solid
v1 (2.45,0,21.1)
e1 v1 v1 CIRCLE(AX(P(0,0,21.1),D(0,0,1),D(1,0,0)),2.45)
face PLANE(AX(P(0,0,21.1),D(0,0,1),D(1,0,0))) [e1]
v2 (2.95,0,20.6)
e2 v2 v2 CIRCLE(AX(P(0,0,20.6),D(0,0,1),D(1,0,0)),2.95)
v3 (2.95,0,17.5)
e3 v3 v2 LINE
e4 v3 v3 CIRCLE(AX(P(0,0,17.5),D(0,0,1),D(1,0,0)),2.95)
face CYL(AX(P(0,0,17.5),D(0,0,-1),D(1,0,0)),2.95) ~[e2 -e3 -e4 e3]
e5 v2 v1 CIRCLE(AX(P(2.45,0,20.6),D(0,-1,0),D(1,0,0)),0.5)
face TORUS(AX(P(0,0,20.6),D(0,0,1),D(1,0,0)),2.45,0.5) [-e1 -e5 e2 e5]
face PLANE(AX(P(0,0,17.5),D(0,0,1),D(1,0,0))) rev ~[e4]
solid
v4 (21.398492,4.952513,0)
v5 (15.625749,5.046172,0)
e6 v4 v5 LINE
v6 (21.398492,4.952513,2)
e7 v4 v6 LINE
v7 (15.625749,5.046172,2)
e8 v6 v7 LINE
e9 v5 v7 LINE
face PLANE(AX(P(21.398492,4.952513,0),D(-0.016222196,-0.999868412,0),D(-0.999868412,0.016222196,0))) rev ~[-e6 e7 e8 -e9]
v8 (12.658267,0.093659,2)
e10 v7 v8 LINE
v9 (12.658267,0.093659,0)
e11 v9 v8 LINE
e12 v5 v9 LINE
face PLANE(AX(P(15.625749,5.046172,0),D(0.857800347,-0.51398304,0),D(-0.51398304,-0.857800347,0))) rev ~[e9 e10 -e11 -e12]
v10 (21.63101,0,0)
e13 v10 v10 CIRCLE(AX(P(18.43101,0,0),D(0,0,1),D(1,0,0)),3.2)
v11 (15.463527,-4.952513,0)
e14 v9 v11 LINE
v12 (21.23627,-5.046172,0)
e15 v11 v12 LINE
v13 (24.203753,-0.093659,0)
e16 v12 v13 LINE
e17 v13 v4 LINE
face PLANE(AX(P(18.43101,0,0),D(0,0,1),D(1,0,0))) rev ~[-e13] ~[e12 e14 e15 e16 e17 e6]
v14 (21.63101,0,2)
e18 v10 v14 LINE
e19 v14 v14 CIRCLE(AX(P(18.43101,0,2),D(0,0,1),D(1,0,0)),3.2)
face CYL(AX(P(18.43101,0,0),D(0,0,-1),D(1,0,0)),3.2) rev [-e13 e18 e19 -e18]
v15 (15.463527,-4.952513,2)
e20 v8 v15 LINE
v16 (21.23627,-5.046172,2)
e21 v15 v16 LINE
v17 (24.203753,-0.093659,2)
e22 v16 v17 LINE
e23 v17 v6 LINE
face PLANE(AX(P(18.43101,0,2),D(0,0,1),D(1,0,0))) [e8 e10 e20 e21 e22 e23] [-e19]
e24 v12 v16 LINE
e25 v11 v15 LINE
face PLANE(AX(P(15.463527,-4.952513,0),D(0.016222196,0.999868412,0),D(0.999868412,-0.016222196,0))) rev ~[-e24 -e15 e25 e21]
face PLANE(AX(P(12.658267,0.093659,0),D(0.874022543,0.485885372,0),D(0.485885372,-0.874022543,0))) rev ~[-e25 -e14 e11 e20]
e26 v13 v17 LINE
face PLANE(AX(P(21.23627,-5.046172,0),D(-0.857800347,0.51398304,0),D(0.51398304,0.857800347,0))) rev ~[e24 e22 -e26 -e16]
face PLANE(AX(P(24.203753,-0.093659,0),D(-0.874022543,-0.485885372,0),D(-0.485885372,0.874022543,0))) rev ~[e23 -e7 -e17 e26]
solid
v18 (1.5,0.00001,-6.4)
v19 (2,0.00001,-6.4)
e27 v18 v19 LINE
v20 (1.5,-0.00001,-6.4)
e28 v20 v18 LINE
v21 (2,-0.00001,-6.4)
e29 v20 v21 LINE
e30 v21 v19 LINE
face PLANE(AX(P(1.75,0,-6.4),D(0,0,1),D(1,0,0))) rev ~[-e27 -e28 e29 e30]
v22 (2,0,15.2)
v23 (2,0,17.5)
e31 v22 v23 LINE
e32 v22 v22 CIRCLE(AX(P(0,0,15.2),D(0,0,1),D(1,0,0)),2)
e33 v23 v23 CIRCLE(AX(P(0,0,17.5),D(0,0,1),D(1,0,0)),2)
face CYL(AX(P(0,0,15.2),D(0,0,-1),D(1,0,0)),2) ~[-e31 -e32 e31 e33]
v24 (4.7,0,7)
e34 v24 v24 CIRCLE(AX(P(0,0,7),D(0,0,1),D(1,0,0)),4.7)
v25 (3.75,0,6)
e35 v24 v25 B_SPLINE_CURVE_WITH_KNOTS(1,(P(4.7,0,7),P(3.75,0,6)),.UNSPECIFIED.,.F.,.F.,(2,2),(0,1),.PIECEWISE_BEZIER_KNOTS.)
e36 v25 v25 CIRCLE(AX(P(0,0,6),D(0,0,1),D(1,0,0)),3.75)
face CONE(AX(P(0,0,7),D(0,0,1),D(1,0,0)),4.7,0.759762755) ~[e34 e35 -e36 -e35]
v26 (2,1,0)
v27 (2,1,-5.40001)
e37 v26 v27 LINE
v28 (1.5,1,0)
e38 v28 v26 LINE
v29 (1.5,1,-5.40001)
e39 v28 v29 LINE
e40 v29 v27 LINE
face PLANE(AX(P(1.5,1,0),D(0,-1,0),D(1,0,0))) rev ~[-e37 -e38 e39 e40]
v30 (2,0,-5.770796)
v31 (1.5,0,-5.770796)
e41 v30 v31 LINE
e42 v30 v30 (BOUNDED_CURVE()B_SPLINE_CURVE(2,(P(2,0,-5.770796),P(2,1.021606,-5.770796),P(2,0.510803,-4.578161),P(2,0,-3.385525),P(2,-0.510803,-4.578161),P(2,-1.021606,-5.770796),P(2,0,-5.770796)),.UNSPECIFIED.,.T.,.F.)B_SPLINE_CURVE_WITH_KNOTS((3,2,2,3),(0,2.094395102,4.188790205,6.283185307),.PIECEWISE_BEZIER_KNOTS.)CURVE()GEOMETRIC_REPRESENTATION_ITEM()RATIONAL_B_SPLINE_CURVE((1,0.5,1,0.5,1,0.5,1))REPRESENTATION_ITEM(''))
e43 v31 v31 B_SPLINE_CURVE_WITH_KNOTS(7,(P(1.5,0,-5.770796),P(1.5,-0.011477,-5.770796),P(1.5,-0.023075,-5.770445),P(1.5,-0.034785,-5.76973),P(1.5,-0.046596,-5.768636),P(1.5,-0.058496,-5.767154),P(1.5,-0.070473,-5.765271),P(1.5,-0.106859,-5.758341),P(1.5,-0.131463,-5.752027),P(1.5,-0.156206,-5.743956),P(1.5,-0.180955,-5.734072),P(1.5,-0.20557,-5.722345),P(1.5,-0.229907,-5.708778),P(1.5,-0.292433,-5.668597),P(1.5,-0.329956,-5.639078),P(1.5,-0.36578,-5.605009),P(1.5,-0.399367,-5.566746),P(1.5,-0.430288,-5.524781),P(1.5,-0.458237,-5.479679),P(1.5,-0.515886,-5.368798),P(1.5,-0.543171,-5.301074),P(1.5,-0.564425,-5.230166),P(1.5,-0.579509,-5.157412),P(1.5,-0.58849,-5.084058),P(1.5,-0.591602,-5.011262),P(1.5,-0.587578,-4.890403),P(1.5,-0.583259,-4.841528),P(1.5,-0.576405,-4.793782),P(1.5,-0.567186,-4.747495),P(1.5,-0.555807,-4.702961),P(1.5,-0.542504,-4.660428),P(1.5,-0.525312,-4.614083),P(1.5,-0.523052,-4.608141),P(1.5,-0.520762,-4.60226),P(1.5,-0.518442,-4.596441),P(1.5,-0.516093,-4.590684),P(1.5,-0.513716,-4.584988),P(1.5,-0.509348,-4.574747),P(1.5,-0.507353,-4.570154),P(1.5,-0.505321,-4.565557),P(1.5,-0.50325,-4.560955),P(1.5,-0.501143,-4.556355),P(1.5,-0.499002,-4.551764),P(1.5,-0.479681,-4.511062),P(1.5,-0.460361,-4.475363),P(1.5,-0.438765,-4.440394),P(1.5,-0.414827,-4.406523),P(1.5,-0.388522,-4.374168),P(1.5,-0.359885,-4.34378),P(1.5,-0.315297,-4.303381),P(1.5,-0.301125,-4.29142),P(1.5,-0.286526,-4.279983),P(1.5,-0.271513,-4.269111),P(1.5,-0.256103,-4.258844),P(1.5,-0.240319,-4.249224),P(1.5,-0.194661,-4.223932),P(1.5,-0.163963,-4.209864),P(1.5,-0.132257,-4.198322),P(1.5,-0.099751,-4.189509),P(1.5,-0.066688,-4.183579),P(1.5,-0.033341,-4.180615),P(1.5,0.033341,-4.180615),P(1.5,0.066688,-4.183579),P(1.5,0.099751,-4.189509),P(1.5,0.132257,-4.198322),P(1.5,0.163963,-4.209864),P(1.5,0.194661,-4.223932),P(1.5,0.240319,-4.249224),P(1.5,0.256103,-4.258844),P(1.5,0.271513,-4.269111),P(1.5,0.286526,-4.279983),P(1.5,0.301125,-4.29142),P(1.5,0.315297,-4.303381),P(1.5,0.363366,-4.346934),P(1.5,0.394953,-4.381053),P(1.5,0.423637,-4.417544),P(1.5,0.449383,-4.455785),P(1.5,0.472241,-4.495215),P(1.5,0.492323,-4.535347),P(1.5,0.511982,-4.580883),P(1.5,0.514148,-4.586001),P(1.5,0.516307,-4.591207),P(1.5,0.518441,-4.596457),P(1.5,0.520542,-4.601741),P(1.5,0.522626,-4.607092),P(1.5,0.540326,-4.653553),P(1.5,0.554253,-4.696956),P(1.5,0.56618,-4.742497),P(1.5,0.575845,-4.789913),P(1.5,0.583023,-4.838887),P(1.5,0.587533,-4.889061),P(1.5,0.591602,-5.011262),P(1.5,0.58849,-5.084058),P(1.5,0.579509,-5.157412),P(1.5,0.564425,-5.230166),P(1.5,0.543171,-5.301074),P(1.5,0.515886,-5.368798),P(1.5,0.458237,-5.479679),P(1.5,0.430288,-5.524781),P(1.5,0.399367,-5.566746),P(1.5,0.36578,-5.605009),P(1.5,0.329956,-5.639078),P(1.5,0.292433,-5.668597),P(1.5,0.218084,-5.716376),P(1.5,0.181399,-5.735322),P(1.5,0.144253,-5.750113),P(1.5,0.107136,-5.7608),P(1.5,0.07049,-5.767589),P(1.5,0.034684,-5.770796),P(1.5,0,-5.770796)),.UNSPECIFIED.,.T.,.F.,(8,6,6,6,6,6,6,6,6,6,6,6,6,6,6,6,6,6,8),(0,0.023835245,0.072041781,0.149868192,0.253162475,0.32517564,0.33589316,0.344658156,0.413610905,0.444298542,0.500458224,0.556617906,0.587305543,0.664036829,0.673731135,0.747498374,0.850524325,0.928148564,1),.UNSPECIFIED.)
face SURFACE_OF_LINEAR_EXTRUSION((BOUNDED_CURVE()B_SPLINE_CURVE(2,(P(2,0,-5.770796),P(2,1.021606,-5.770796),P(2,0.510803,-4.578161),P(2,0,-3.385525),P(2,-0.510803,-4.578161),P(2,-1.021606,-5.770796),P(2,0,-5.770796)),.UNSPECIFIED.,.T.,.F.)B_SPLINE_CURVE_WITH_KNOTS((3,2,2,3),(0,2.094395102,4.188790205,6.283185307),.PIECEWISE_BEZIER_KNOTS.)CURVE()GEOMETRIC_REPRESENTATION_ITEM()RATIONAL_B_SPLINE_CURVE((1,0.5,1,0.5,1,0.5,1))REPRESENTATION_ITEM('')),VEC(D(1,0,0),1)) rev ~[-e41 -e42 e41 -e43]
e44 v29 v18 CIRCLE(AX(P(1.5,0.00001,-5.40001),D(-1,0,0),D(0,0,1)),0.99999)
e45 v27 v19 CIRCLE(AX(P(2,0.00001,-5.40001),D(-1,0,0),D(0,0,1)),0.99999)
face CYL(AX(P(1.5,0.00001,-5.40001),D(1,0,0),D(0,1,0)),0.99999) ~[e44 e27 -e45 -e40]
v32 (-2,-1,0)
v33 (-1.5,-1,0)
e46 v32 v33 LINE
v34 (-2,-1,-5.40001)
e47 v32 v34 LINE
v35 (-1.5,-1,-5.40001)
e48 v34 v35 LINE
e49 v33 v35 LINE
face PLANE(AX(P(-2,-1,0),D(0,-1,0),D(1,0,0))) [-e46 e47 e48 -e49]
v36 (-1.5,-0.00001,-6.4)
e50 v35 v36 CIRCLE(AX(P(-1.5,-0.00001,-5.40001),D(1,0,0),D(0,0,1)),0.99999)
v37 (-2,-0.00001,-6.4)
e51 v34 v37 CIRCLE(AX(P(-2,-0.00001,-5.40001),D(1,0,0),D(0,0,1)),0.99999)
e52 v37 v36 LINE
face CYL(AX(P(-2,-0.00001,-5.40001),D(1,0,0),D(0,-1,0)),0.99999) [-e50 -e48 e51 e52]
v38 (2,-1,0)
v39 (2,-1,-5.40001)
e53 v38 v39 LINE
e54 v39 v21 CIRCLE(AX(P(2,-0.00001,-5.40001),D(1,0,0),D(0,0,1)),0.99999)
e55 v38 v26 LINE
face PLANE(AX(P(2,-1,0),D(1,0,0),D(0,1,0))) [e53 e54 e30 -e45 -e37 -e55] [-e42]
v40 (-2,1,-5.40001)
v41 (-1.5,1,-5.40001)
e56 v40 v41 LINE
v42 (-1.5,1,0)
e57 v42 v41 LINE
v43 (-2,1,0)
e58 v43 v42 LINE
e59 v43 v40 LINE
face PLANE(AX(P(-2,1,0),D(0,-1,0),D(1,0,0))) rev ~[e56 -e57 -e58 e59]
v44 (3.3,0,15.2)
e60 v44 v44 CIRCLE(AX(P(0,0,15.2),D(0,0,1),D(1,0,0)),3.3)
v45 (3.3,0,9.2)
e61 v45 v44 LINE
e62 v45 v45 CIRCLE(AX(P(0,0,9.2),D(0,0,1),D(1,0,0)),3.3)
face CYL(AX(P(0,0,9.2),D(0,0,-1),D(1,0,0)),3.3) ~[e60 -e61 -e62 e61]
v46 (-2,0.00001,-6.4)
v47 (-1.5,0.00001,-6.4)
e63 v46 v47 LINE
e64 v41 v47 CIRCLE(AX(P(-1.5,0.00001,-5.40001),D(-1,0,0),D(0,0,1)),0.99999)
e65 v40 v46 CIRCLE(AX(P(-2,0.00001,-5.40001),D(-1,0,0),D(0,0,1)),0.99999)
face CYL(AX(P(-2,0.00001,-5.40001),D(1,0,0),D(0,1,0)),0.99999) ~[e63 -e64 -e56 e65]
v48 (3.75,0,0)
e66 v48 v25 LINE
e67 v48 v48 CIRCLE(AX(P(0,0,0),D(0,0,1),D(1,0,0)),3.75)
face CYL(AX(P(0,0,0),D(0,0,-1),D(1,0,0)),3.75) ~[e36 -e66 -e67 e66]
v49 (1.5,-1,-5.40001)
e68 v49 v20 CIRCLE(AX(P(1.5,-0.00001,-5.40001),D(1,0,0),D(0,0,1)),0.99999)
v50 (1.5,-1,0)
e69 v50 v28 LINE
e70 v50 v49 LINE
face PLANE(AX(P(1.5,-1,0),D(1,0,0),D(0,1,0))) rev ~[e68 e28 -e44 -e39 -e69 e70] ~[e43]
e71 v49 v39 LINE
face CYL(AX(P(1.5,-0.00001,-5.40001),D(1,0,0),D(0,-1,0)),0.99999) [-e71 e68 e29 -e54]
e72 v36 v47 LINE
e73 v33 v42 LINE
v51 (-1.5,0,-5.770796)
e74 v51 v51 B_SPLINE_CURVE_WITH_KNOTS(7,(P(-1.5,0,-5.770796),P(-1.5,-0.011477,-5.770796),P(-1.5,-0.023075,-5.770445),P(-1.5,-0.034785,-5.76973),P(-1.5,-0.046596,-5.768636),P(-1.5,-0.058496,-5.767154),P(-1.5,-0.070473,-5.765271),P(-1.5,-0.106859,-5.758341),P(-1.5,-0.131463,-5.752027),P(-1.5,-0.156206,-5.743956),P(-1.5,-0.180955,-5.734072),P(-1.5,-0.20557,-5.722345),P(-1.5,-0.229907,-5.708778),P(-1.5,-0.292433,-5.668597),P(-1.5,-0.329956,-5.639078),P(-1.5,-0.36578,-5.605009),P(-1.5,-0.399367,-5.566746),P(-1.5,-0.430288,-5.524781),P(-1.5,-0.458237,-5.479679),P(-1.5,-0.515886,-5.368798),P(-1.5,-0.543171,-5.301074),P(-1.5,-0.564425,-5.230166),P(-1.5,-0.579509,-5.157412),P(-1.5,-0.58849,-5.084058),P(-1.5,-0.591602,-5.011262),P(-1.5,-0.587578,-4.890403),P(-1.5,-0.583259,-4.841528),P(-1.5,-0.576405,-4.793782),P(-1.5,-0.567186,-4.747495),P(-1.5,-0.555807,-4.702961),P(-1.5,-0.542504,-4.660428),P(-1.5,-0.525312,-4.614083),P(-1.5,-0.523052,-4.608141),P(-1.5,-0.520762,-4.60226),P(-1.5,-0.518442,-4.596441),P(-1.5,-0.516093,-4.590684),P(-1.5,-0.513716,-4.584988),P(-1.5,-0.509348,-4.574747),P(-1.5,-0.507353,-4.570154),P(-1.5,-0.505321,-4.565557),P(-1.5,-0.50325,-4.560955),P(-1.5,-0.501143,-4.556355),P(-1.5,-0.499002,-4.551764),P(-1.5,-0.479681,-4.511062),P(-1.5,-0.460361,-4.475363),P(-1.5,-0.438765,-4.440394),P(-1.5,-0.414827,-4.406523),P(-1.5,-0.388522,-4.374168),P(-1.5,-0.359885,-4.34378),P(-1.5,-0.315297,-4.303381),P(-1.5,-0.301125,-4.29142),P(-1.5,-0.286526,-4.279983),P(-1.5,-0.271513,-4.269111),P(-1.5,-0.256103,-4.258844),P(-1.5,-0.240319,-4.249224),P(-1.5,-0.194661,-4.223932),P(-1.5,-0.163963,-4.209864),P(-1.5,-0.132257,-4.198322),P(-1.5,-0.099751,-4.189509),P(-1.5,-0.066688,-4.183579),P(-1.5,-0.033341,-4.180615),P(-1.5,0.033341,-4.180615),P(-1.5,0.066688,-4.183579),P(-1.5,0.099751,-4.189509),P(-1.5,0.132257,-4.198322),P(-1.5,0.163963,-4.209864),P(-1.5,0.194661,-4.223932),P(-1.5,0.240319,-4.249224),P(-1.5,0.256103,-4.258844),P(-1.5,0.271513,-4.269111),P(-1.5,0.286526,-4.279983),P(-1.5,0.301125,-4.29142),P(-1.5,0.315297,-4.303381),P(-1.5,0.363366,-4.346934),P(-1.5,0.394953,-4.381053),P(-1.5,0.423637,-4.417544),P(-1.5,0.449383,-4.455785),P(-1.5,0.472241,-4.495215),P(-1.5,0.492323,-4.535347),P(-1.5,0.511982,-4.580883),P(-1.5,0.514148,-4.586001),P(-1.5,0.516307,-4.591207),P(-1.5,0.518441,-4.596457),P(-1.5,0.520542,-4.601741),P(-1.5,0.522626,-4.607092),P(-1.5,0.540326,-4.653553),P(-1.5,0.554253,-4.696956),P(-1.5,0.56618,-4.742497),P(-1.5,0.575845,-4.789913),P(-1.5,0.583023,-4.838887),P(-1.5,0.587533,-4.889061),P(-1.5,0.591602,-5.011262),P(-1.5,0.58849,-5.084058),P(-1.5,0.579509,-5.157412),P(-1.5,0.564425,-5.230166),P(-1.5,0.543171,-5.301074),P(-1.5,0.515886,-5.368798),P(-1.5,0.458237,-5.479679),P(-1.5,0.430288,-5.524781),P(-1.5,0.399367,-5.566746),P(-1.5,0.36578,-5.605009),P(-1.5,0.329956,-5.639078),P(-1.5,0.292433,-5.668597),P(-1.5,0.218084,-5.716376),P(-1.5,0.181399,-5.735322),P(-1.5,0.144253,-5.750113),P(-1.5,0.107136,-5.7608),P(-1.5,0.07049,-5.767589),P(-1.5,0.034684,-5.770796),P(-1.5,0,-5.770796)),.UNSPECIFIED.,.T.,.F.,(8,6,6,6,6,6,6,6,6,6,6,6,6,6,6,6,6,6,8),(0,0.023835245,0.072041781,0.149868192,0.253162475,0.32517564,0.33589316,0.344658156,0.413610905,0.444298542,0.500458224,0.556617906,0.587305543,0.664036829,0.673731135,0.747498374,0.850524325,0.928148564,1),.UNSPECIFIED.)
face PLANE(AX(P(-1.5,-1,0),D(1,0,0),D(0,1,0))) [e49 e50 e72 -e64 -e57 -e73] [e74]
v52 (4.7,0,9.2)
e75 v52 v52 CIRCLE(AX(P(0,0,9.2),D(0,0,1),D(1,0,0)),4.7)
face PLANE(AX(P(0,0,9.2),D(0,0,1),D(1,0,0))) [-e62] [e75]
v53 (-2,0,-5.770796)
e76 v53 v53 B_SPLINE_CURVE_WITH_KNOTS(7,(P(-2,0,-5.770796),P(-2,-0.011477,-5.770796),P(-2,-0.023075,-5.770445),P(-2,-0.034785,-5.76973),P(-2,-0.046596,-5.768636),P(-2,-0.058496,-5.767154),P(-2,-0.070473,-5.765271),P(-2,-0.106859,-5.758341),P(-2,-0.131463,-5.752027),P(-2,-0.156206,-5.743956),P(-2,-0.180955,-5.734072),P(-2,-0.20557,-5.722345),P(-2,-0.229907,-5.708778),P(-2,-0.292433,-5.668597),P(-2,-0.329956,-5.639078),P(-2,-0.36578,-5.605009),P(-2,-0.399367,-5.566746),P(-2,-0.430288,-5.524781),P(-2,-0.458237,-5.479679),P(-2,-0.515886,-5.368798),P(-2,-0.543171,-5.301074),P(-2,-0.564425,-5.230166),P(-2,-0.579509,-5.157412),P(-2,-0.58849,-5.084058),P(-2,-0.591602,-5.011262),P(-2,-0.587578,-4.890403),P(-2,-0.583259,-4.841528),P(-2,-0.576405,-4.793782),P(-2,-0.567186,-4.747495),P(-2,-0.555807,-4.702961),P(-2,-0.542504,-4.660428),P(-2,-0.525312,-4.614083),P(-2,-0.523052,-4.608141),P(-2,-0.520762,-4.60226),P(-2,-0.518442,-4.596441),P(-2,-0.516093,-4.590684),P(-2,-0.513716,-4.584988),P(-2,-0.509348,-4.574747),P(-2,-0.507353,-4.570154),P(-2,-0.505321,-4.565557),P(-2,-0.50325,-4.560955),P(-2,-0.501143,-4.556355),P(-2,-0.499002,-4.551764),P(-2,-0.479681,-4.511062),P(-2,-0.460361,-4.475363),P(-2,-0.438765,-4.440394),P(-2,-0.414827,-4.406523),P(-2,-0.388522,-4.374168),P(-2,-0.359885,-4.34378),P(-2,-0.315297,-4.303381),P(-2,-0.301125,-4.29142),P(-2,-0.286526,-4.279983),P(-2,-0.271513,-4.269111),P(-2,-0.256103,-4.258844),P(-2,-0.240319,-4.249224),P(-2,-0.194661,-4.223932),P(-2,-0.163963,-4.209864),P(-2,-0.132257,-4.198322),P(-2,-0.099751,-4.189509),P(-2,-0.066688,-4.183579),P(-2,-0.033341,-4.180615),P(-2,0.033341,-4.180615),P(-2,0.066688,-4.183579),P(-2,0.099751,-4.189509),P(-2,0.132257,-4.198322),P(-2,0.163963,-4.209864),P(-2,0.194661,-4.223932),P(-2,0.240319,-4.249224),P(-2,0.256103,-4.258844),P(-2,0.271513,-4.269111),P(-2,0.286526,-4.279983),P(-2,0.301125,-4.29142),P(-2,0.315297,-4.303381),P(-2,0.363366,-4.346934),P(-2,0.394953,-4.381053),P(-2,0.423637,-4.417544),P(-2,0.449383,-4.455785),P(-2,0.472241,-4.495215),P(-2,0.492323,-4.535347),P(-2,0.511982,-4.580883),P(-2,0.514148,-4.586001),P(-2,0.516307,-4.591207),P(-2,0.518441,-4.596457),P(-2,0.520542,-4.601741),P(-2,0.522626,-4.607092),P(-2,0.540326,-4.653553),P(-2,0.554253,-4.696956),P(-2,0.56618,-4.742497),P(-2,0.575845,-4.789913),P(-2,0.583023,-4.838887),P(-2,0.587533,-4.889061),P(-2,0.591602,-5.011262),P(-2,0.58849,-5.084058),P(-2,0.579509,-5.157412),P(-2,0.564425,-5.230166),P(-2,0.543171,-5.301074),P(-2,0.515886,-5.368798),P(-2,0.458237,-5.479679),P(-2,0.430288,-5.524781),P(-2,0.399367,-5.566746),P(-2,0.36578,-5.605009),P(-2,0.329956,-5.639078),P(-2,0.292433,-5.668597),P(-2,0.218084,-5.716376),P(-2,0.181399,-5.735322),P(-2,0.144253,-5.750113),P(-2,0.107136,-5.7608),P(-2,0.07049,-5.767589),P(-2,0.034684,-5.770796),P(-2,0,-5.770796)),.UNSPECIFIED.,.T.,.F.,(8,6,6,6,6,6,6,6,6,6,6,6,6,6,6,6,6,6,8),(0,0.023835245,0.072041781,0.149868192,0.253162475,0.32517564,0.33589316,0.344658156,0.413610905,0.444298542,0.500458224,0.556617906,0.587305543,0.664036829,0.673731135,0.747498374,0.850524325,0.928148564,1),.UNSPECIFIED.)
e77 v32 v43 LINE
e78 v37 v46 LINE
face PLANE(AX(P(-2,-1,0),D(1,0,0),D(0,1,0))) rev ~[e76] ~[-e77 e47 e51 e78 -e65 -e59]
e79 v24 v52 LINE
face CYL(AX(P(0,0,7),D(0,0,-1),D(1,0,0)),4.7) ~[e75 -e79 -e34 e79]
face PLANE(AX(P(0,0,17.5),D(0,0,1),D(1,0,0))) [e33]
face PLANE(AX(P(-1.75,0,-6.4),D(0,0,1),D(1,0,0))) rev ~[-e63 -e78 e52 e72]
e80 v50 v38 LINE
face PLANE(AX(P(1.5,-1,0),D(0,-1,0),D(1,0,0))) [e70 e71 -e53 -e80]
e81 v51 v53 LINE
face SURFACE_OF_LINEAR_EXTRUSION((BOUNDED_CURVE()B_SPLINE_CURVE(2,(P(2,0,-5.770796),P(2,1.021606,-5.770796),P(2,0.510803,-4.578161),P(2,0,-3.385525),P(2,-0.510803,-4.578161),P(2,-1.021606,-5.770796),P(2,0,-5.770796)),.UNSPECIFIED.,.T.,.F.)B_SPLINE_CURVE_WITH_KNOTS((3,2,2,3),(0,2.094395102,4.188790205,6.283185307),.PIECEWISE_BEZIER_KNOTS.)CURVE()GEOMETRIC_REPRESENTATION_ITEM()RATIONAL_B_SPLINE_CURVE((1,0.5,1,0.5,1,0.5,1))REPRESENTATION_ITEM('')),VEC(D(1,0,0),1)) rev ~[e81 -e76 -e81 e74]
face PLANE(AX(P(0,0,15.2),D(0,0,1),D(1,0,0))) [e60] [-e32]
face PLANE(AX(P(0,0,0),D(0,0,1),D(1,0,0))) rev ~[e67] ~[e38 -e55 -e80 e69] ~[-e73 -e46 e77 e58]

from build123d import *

# Parameters (mm, degrees)
F0_R      = 3.75
F0_W      = 0.5
F0_H      = 2
F1_DEPTH  = 6
F3_R      = 4.7
F1_FACE_R = 3.75
F5_DEPTH  = 2.2
F6_R      = 3.3
F7_DEPTH  = 6
F8_R      = 2
F9_DEPTH  = 2.3
F10_R     = 2.95
F11_DEPTH = 3.6
F12_R     = 0.5
F13_DEPTH = 6.4
F15_DEPTH = 6.7010001
F16_R     = 0.99999
F0_R_2    = 3.2
F17_DEPTH = 2


# Not quite as in the source:
# - a fillet or chamfer is up to 0.001 mm smaller than in the source, because OpenCascade refuses the exact size


with BuildPart() as f1:
    # F0 (on Top) → F1 (new body)
    with BuildSketch(Plane.XY):
        Circle(F0_R)
        with Locations((-1.75, 0)):
            Rectangle(F0_W, F0_H, mode=Mode.SUBTRACT)
        with Locations((1.75, 0)):
            Rectangle(F0_W, F0_H, mode=Mode.SUBTRACT)
        with Locations((-1.75, 0)):
            Rectangle(F0_W, F0_H)
        with Locations((1.75, 0)):
            Rectangle(F0_W, F0_H)
    extrude(amount=F1_DEPTH)

    # F3 (on offset) → F4 section 0
    with BuildSketch(Plane.XY.offset(7)):
        Circle(F3_R)
    # F1_face (on face) → F4 section 1
    with BuildSketch(Plane.XY.offset(6)):
        Circle(F1_FACE_R)
    loft()

    # F3 (on offset) → F5 (join)
    with BuildSketch(Plane.XY.offset(7)):
        Circle(F3_R)
    extrude(amount=F5_DEPTH)

    # F6 (on face) → F7 (join)
    with BuildSketch(Plane.XY.offset(9.2)):
        Circle(F6_R)
    extrude(amount=F7_DEPTH)

    # F8 (on face) → F9 (join)
    with BuildSketch(Plane.XY.offset(15.2)):
        Circle(F8_R)
    extrude(amount=F9_DEPTH)

    # F0 (on Top) → F13 (join)
    with BuildSketch(Plane.XY):
        with Locations((-1.75, 0)):
            Rectangle(F0_W, F0_H)
        with Locations((1.75, 0)):
            Rectangle(F0_W, F0_H)
    extrude(amount=-F13_DEPTH)

    # F14 (on face) → F15 (cut, through all)
    with BuildSketch(Plane.YZ.offset(2)):
        with BuildLine():
            add(Edge.make_bspline(
                [(0, -5.7707964443), (1.0216056149, -5.7707964443), (0.5108028075, -4.5781605877), (0, -3.3855247311), (-0.5108028075, -4.5781605877), (-1.0216056149, -5.7707964443), (0, -5.7707964443)],
                knots=[0, 0, 0, 2.0943951024, 2.0943951024, 4.1887902048, 4.1887902048, 6.2831853072, 6.2831853072, 6.2831853072], degree=2, weights=[1, 0.5, 1, 0.5, 1, 0.5, 1]))
        make_face()
    extrude(amount=-F15_DEPTH, mode=Mode.SUBTRACT)

    # F16 (radius 1 in the source; OpenCascade refuses exactly that, so slightly less here)
    f16_edges = [f1.edges().sort_by_distance(p)[0] for p in [
        (1.75, 1, -6.4),
        (1.75, -1, -6.4),
        (-1.75, 1, -6.4),
        (-1.75, -1, -6.4),
    ]]
    fillet(f16_edges, radius=F16_R)


with BuildPart() as f11:
    # F10 (on face) → F11 (new body)
    with BuildSketch(Plane.XY.offset(17.5)):
        Circle(F10_R)
    extrude(amount=F11_DEPTH)

    # F12
    f12_edges = [f11.edges().sort_by_distance(p)[0] for p in [
        (-2.95, 0, 21.1),
    ]]
    fillet(f12_edges, radius=F12_R)


with BuildPart() as f17:
    # F0 (on Top) → F17 (new body)
    with BuildSketch(Plane.XY):
        Polygon((24.2037526902, -0.0936588947), (21.3984921896, 4.9525126102), (15.6257492242, 5.0461715049), (12.6582667593, 0.0936588947), (15.4635272599, -4.9525126102), (21.2362702253, -5.0461715049), align=None)
        with Locations((18.4310097247, 0)):
            Circle(F0_R_2, mode=Mode.SUBTRACT)
    extrude(amount=F17_DEPTH)


solid = Compound([f1.part, f11.part, f17.part])
